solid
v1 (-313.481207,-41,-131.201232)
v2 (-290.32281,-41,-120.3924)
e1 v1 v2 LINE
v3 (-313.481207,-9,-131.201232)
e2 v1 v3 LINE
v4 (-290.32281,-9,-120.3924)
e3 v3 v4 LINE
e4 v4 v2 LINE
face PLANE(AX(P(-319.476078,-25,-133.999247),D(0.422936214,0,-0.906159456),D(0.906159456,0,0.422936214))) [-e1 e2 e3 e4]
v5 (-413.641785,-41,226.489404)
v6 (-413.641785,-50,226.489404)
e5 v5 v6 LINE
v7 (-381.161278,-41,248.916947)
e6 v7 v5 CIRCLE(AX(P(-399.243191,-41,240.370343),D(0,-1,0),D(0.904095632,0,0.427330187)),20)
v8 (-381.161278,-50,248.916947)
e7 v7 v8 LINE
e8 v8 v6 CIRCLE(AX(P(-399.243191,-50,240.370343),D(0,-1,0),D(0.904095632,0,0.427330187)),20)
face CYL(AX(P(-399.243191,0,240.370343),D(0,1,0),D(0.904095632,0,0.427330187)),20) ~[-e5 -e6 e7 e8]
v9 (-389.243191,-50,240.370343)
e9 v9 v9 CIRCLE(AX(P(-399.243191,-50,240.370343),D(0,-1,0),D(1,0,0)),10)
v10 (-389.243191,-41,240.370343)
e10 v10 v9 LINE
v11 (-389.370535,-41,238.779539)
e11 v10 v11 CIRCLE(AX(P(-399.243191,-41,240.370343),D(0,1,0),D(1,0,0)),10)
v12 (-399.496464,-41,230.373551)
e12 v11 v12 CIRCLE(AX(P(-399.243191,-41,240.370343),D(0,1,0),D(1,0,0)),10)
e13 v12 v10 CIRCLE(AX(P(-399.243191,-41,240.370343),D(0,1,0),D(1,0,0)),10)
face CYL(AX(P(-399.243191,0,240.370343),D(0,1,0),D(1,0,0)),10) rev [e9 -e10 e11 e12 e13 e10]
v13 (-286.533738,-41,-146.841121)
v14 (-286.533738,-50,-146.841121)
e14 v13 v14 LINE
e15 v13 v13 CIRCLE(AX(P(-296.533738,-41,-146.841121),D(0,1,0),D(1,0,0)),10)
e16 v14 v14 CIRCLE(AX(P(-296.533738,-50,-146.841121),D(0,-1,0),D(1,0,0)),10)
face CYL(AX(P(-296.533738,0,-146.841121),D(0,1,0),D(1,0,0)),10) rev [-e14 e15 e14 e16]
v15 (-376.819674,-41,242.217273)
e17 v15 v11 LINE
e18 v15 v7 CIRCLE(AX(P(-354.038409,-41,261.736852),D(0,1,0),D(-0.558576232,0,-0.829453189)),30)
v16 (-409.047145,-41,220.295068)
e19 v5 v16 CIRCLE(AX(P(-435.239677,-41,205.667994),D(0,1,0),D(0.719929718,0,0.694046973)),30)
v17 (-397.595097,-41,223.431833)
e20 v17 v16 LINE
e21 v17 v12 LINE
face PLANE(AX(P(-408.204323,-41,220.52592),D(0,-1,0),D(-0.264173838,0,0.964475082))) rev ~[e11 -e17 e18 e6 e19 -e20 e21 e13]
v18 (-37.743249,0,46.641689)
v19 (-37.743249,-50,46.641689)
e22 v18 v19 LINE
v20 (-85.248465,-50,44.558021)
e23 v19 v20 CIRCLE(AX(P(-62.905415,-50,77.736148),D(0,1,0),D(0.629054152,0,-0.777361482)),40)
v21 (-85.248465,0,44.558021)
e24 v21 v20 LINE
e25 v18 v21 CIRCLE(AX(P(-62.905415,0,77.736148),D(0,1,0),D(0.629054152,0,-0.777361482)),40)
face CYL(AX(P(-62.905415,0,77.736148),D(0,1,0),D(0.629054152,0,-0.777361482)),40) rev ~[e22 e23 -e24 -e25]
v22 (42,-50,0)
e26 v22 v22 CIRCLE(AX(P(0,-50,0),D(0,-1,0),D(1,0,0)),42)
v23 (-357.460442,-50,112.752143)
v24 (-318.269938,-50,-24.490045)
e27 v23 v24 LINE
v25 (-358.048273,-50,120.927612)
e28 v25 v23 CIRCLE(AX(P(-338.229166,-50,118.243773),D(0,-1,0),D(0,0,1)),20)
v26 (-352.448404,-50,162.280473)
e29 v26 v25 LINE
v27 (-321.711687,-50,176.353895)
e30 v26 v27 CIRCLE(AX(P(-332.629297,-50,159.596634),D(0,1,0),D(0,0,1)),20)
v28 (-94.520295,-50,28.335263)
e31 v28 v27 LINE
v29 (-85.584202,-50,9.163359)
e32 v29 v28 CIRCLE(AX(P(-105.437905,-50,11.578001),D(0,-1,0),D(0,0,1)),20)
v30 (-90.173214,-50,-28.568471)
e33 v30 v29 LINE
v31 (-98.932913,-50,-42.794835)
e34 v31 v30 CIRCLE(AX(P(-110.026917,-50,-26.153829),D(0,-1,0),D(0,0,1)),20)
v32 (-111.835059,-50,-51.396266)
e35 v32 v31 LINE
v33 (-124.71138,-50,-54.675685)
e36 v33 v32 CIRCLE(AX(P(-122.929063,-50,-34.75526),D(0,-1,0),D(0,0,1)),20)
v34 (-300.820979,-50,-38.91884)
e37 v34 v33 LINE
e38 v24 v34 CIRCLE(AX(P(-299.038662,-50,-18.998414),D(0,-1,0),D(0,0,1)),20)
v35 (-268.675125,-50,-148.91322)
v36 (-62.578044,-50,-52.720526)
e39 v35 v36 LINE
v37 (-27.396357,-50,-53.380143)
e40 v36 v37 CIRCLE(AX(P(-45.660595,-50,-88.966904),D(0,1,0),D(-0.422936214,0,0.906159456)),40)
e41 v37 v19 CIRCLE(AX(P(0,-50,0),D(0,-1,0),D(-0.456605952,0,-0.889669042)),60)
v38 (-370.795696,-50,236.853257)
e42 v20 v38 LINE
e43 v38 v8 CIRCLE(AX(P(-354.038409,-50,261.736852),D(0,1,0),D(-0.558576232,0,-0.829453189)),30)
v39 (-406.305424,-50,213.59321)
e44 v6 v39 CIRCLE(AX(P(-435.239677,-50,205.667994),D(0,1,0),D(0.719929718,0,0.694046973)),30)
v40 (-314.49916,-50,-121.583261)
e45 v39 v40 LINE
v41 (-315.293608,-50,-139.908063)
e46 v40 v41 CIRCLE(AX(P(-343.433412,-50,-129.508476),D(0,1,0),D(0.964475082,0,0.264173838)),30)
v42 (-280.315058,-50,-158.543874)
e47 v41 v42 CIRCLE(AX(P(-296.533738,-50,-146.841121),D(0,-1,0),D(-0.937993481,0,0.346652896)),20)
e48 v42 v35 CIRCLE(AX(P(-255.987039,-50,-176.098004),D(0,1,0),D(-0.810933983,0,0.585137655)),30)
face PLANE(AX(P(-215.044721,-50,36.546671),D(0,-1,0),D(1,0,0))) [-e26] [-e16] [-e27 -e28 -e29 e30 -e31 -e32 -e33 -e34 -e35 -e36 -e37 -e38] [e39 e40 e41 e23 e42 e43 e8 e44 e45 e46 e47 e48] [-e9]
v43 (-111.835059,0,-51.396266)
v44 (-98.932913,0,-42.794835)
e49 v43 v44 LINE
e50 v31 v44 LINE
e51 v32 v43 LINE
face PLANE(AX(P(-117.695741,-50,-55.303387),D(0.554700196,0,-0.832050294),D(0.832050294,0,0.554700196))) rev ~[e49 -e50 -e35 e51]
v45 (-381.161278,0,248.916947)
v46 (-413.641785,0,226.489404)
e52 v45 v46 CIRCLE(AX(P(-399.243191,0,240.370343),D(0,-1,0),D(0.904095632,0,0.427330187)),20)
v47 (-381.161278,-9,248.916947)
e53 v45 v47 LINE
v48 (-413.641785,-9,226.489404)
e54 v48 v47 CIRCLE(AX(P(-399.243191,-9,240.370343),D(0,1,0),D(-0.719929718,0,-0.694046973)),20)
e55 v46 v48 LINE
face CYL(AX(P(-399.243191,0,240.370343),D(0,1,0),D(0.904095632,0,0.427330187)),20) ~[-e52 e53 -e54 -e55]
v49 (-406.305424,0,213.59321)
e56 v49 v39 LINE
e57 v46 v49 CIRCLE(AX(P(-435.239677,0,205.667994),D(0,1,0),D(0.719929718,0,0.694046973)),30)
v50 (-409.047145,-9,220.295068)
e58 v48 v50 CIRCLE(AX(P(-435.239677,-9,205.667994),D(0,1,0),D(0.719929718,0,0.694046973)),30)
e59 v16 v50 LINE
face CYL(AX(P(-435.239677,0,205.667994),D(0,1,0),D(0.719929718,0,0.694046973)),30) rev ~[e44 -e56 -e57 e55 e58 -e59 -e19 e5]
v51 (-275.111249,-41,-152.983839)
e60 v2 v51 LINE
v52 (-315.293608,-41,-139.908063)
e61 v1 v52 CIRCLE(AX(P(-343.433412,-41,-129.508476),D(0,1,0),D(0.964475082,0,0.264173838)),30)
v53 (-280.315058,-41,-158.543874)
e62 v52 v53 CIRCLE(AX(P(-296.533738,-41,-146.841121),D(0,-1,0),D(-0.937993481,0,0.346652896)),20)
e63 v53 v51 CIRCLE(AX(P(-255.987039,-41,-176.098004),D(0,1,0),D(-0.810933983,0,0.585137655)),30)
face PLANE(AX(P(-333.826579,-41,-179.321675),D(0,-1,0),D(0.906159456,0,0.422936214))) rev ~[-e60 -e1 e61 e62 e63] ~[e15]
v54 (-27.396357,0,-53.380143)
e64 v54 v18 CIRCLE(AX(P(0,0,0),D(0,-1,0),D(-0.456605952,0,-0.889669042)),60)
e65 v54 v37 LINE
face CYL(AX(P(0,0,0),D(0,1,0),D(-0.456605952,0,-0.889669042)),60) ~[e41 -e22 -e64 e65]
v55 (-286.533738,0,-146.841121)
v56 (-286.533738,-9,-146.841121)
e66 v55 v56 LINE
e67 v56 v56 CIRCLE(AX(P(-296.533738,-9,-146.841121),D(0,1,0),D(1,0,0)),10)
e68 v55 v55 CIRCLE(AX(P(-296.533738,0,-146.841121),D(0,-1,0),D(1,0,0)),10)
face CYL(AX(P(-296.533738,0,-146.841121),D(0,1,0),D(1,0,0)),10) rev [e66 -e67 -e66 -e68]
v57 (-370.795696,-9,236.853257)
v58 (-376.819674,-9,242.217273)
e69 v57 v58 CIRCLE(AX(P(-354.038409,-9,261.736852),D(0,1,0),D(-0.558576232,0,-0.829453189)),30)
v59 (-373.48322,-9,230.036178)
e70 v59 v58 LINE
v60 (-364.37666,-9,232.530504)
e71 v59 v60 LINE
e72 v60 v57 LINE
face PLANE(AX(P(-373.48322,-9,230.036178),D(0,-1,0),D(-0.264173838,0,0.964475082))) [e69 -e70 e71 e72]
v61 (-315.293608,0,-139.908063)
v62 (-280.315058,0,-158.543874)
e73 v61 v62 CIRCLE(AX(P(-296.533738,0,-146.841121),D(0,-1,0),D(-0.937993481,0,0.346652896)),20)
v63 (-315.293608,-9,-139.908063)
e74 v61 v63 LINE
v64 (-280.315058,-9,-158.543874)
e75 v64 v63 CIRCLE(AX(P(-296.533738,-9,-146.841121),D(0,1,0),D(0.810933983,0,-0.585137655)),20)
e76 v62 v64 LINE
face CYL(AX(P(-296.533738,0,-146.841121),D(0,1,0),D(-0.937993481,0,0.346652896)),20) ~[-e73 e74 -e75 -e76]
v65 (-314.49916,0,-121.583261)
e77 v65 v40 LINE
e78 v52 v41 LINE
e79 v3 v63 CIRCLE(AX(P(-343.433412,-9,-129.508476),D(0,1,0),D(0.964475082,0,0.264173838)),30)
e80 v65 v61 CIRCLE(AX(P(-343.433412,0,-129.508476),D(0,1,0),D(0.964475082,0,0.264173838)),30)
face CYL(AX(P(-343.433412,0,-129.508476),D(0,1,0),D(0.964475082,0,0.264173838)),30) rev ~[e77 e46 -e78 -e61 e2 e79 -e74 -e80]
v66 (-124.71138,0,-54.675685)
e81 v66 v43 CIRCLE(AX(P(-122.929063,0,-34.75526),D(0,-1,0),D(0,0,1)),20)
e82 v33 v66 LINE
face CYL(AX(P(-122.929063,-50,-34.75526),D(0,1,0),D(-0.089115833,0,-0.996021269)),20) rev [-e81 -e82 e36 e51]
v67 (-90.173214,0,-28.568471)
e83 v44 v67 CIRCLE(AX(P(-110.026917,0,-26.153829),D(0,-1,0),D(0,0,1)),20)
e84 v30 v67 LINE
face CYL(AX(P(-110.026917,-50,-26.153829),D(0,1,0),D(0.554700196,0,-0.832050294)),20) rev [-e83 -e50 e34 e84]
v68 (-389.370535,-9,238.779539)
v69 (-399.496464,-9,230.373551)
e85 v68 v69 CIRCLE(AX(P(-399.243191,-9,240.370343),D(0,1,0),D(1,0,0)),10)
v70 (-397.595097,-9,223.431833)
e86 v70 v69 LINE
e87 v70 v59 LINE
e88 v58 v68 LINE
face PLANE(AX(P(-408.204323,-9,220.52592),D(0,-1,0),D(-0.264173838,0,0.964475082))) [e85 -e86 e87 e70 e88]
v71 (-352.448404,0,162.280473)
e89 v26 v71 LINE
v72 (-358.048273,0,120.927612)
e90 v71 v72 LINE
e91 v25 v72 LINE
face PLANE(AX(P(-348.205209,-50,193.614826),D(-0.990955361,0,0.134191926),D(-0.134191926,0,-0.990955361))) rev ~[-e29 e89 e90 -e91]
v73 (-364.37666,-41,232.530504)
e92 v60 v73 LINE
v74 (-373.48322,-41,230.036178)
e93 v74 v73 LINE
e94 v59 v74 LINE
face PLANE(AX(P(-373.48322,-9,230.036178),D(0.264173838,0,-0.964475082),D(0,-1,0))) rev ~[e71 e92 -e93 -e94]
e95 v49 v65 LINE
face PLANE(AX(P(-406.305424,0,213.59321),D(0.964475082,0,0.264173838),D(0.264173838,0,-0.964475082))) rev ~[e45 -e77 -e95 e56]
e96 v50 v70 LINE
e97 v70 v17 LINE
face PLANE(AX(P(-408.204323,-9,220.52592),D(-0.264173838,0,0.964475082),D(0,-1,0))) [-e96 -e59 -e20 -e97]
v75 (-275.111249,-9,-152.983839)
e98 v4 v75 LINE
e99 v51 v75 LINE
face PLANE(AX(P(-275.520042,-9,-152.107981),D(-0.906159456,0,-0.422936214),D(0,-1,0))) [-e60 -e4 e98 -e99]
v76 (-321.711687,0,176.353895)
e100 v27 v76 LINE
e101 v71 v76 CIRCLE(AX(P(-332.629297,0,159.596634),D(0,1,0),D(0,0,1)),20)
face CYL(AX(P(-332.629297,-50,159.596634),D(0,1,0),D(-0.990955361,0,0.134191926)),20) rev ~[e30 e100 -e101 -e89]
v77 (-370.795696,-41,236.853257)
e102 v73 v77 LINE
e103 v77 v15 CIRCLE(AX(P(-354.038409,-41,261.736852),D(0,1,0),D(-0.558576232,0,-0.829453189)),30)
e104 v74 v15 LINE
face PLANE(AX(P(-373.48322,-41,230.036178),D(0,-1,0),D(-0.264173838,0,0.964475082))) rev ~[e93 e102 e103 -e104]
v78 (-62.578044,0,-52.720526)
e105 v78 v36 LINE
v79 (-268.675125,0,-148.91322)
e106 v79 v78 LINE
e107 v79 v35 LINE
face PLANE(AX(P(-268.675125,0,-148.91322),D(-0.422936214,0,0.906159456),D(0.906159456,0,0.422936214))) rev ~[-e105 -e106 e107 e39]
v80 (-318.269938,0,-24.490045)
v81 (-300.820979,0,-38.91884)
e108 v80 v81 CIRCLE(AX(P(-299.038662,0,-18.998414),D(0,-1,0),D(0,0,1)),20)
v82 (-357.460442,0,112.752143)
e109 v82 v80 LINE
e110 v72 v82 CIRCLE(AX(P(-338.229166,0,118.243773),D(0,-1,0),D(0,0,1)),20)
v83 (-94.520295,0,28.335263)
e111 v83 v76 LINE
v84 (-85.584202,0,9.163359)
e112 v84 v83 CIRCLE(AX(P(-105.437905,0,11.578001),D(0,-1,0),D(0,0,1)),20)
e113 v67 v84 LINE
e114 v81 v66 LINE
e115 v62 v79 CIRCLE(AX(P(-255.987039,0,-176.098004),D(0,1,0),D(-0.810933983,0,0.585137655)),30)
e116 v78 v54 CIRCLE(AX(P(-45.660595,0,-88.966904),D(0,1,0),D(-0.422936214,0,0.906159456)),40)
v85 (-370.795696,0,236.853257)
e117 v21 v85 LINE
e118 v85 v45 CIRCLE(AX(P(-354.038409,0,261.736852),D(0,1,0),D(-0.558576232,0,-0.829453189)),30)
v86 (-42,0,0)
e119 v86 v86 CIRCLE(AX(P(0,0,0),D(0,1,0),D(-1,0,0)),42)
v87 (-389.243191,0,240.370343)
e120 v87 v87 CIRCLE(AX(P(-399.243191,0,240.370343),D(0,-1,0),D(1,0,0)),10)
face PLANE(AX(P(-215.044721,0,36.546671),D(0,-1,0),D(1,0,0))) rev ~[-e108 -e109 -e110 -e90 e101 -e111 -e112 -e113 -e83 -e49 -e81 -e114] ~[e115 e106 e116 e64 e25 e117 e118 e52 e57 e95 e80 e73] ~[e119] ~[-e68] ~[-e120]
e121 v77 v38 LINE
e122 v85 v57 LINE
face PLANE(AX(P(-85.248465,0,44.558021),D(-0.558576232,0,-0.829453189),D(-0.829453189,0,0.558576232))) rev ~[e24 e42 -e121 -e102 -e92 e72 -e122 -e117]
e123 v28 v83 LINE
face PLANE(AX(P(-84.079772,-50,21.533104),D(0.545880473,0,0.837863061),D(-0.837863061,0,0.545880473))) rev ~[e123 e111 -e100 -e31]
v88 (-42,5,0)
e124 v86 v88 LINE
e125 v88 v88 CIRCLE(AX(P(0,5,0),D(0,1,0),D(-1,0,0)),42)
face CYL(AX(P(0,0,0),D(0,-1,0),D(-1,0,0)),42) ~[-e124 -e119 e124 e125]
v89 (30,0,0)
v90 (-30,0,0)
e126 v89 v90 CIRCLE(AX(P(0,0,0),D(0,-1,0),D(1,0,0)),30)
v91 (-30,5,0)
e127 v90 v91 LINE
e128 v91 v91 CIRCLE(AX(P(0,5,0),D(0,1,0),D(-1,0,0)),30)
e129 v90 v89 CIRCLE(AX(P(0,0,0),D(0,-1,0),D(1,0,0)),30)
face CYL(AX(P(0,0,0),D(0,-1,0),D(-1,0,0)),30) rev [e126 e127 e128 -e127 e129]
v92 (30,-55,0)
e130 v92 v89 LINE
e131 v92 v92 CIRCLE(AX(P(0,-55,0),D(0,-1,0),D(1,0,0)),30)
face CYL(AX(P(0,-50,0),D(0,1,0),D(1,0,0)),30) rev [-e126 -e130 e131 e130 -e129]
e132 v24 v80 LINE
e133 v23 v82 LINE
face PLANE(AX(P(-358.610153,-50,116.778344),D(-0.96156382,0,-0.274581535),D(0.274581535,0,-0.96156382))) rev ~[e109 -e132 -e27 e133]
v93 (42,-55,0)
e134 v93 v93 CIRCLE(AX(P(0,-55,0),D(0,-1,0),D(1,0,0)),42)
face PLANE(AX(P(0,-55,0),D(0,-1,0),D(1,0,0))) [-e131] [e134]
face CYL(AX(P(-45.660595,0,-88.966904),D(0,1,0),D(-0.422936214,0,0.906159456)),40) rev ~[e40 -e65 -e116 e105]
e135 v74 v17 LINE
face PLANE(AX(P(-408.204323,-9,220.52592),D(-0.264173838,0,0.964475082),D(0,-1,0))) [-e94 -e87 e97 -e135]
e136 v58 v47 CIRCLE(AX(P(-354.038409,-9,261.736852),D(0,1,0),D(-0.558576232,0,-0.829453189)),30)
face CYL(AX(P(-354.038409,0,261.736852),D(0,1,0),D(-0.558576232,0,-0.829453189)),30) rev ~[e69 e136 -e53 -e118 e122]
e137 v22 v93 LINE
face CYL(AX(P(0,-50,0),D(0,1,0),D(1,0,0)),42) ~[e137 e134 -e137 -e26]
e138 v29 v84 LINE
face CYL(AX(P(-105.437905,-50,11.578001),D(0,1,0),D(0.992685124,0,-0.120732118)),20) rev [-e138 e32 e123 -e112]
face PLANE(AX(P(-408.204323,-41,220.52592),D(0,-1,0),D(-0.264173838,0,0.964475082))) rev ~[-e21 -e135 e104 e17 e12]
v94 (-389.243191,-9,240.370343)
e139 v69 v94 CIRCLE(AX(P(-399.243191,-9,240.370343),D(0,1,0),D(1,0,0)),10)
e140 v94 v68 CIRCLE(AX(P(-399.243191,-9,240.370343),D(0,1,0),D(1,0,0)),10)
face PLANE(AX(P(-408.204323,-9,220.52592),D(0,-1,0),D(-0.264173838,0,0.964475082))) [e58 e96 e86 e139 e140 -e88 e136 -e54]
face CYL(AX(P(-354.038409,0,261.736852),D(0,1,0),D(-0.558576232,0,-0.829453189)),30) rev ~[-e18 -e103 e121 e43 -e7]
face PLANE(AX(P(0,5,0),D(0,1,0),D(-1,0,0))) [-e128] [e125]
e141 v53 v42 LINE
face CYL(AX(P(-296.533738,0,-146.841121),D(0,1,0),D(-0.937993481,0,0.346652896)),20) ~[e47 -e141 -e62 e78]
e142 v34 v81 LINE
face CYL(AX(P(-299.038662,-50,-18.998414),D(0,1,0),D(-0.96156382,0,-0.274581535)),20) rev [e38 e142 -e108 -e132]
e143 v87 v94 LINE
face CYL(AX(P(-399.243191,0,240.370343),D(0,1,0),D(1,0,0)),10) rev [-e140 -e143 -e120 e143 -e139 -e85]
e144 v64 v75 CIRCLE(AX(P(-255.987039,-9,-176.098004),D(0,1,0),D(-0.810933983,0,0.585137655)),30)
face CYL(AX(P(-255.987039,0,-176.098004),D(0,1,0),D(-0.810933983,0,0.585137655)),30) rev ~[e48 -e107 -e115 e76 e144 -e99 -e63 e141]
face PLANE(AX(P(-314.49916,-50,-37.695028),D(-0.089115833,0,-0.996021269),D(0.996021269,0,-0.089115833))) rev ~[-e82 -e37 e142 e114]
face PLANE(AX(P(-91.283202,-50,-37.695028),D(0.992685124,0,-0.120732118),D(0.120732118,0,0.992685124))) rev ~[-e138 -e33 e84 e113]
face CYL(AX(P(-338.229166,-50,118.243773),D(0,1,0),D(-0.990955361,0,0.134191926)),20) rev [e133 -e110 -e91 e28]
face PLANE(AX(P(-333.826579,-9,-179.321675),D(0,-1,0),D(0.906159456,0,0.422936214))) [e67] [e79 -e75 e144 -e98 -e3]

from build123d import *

# Parameters (mm, degrees)
F0_R           = 10
F0_R_2         = 30
F1_DEPTH       = 50
F3_W           = 32
F3_H           = 46.9773098714
F4_DEPTH       = 36
F4_DEPTH_BACK  = 36
F7_W           = 64.344675952
F7_H           = 32
F8_DEPTH       = 35
F8_DEPTH_BACK  = 25
F10_DEPTH      = 100
F11_R          = 20
F12_R          = 42
F12_R_2        = 30
F13_DEPTH      = 5
F14_R          = 42
F14_R_2        = 30
F15_DEPTH      = 5
F16_W          = 32
F16_H          = 12.6297663026
F17_DEPTH      = 25
F17_DEPTH_BACK = 25


# Not quite as in the source:
# - a feature names something its author has since deleted; it is built from what else it names


with BuildPart() as f1:
    # F0 (on Front) → F1 (new body)
    with BuildSketch(Plane.XZ):
        with BuildLine():
            ThreePointArc((-62.5780437897, -52.7205259787), (-44.9107725801, -48.9739327439), (-27.3963571385, -53.3801425208))
            ThreePointArc((-27.3963571385, -53.3801425208), (59.6815194776, 6.173834533), (-37.7432491465, 46.6416889045))
            ThreePointArc((-37.7432491465, 46.6416889045), (-61.1526251037, 37.7745700431), (-85.2484645361, 44.5580206149))
            Line((-85.2484645361, 44.5580206149), (-370.7956962097, 236.8532567171))
            ThreePointArc((-370.7956962097, 236.8532567171), (-376.7925336048, 242.1856420807), (-381.1612781983, 248.9169467897))
            ThreePointArc((-381.1612781983, 248.9169467897), (-410.6071858154, 256.8281563435), (-413.6417851947, 226.4894035906))
            ThreePointArc((-413.6417851947, 226.4894035906), (-409.1637807856, 220.5019975774), (-406.3054242786, 213.5932095263))
            Line((-406.3054242786, 213.5932095263), (-314.4991596079, -121.5832610972))
            ThreePointArc((-314.4991596079, -121.5832610972), (-313.4615655347, -130.8078667851), (-315.293607643, -139.9080631166))
            ThreePointArc((-315.293607643, -139.9080631166), (-305.9378740774, -164.4922463623), (-280.3150583777, -158.5438741459))
            ThreePointArc((-280.3150583777, -158.5438741459), (-275.1112486364, -152.9838392789), (-268.6751253171, -148.913220141))
            Line((-268.6751253171, -148.913220141), (-62.5780437897, -52.7205259787))
        make_face()
        with Locations((-296.5337380309, -146.8411210378)):
            Circle(F0_R, mode=Mode.SUBTRACT)
        Circle(F0_R_2, mode=Mode.SUBTRACT)
        with Locations((-399.2431908367, 240.3703430585)):
            Circle(F0_R, mode=Mode.SUBTRACT)
    extrude(amount=F1_DEPTH)

    # F3 (on face) → F4 (cut, two sides)
    with BuildSketch(Plane(origin=(-323.5290376394, 0, -88.6159831057), x_dir=(0, -1, 0), z_dir=(-0.9644750818, 0, -0.2641738379))) as f4_sk:
        with Locations((25, 344.0173126814)):
            Rectangle(F3_W, F3_H)
    extrude(amount=F4_DEPTH, mode=Mode.SUBTRACT)
    extrude(f4_sk.sketch, amount=-F4_DEPTH_BACK, mode=Mode.SUBTRACT)

    # F7 (on offset) → F8 (cut, two sides)
    with BuildSketch(Plane(origin=(9.0113675019, 0, -19.3072515422), x_dir=(0.9061594556, 0, 0.422936214), z_dir=(0.422936214, 0, -0.9061594556))) as f8_sk:
        with Locations((-346.1694030438, 25)):
            Rectangle(F7_W, F7_H)
    extrude(amount=-F8_DEPTH, mode=Mode.SUBTRACT)
    extrude(f8_sk.sketch, amount=F8_DEPTH_BACK, mode=Mode.SUBTRACT)

    # F9 (on face) → F10 (cut)
    with BuildSketch(Plane.XZ.offset(50)):
        Polygon((-348.2052087784, 193.6148256063), (-358.6101531982, 116.7783439159), (-314.4991596079, -37.6950278878), (-117.6957413554, -55.3033873439), (-91.2832021713, -37.6950278878), (-84.079772234, 21.5331036597), align=None)
    extrude(amount=-F10_DEPTH, mode=Mode.SUBTRACT)

    # F11
    f11_edges = [f1.edges().sort_by_distance(p)[0] for p in [
        (-348.205209, -25, 193.614826),
        (-358.610153, -25, 116.778344),
        (-84.079772, -25, 21.533104),
        (-91.283202, -25, -37.695028),
        (-117.695741, -25, -55.303387),
        (-314.49916, -25, -37.695028),
    ]]
    fillet(f11_edges, radius=F11_R)

    # F12 (on face) → F13 (join)
    with BuildSketch(Plane.XZ.offset(50)):
        Circle(F12_R)
        Circle(F12_R_2, mode=Mode.SUBTRACT)
    extrude(amount=F13_DEPTH)

    # F14 (on face) → F15 (join)
    with BuildSketch(Plane(origin=(0, 0, 0), x_dir=(-1, 0, 0), z_dir=(0, 1, 0))):
        Circle(F14_R)
        Circle(F14_R_2, mode=Mode.SUBTRACT)
    extrude(amount=F15_DEPTH)

    # F16 (on face) → F17 (cut, two sides)
    with BuildSketch(Plane(origin=(-288.8079346956, 0, -79.1057249405), x_dir=(0, -1, 0), z_dir=(-0.9644750818, 0, -0.2641738379))) as f17_sk:
        with Locations((25, 326.843540897)):
            Rectangle(F16_W, F16_H)
    extrude(amount=F17_DEPTH, mode=Mode.SUBTRACT)
    extrude(f17_sk.sketch, amount=-F17_DEPTH_BACK, mode=Mode.SUBTRACT)


solid = f1.part
